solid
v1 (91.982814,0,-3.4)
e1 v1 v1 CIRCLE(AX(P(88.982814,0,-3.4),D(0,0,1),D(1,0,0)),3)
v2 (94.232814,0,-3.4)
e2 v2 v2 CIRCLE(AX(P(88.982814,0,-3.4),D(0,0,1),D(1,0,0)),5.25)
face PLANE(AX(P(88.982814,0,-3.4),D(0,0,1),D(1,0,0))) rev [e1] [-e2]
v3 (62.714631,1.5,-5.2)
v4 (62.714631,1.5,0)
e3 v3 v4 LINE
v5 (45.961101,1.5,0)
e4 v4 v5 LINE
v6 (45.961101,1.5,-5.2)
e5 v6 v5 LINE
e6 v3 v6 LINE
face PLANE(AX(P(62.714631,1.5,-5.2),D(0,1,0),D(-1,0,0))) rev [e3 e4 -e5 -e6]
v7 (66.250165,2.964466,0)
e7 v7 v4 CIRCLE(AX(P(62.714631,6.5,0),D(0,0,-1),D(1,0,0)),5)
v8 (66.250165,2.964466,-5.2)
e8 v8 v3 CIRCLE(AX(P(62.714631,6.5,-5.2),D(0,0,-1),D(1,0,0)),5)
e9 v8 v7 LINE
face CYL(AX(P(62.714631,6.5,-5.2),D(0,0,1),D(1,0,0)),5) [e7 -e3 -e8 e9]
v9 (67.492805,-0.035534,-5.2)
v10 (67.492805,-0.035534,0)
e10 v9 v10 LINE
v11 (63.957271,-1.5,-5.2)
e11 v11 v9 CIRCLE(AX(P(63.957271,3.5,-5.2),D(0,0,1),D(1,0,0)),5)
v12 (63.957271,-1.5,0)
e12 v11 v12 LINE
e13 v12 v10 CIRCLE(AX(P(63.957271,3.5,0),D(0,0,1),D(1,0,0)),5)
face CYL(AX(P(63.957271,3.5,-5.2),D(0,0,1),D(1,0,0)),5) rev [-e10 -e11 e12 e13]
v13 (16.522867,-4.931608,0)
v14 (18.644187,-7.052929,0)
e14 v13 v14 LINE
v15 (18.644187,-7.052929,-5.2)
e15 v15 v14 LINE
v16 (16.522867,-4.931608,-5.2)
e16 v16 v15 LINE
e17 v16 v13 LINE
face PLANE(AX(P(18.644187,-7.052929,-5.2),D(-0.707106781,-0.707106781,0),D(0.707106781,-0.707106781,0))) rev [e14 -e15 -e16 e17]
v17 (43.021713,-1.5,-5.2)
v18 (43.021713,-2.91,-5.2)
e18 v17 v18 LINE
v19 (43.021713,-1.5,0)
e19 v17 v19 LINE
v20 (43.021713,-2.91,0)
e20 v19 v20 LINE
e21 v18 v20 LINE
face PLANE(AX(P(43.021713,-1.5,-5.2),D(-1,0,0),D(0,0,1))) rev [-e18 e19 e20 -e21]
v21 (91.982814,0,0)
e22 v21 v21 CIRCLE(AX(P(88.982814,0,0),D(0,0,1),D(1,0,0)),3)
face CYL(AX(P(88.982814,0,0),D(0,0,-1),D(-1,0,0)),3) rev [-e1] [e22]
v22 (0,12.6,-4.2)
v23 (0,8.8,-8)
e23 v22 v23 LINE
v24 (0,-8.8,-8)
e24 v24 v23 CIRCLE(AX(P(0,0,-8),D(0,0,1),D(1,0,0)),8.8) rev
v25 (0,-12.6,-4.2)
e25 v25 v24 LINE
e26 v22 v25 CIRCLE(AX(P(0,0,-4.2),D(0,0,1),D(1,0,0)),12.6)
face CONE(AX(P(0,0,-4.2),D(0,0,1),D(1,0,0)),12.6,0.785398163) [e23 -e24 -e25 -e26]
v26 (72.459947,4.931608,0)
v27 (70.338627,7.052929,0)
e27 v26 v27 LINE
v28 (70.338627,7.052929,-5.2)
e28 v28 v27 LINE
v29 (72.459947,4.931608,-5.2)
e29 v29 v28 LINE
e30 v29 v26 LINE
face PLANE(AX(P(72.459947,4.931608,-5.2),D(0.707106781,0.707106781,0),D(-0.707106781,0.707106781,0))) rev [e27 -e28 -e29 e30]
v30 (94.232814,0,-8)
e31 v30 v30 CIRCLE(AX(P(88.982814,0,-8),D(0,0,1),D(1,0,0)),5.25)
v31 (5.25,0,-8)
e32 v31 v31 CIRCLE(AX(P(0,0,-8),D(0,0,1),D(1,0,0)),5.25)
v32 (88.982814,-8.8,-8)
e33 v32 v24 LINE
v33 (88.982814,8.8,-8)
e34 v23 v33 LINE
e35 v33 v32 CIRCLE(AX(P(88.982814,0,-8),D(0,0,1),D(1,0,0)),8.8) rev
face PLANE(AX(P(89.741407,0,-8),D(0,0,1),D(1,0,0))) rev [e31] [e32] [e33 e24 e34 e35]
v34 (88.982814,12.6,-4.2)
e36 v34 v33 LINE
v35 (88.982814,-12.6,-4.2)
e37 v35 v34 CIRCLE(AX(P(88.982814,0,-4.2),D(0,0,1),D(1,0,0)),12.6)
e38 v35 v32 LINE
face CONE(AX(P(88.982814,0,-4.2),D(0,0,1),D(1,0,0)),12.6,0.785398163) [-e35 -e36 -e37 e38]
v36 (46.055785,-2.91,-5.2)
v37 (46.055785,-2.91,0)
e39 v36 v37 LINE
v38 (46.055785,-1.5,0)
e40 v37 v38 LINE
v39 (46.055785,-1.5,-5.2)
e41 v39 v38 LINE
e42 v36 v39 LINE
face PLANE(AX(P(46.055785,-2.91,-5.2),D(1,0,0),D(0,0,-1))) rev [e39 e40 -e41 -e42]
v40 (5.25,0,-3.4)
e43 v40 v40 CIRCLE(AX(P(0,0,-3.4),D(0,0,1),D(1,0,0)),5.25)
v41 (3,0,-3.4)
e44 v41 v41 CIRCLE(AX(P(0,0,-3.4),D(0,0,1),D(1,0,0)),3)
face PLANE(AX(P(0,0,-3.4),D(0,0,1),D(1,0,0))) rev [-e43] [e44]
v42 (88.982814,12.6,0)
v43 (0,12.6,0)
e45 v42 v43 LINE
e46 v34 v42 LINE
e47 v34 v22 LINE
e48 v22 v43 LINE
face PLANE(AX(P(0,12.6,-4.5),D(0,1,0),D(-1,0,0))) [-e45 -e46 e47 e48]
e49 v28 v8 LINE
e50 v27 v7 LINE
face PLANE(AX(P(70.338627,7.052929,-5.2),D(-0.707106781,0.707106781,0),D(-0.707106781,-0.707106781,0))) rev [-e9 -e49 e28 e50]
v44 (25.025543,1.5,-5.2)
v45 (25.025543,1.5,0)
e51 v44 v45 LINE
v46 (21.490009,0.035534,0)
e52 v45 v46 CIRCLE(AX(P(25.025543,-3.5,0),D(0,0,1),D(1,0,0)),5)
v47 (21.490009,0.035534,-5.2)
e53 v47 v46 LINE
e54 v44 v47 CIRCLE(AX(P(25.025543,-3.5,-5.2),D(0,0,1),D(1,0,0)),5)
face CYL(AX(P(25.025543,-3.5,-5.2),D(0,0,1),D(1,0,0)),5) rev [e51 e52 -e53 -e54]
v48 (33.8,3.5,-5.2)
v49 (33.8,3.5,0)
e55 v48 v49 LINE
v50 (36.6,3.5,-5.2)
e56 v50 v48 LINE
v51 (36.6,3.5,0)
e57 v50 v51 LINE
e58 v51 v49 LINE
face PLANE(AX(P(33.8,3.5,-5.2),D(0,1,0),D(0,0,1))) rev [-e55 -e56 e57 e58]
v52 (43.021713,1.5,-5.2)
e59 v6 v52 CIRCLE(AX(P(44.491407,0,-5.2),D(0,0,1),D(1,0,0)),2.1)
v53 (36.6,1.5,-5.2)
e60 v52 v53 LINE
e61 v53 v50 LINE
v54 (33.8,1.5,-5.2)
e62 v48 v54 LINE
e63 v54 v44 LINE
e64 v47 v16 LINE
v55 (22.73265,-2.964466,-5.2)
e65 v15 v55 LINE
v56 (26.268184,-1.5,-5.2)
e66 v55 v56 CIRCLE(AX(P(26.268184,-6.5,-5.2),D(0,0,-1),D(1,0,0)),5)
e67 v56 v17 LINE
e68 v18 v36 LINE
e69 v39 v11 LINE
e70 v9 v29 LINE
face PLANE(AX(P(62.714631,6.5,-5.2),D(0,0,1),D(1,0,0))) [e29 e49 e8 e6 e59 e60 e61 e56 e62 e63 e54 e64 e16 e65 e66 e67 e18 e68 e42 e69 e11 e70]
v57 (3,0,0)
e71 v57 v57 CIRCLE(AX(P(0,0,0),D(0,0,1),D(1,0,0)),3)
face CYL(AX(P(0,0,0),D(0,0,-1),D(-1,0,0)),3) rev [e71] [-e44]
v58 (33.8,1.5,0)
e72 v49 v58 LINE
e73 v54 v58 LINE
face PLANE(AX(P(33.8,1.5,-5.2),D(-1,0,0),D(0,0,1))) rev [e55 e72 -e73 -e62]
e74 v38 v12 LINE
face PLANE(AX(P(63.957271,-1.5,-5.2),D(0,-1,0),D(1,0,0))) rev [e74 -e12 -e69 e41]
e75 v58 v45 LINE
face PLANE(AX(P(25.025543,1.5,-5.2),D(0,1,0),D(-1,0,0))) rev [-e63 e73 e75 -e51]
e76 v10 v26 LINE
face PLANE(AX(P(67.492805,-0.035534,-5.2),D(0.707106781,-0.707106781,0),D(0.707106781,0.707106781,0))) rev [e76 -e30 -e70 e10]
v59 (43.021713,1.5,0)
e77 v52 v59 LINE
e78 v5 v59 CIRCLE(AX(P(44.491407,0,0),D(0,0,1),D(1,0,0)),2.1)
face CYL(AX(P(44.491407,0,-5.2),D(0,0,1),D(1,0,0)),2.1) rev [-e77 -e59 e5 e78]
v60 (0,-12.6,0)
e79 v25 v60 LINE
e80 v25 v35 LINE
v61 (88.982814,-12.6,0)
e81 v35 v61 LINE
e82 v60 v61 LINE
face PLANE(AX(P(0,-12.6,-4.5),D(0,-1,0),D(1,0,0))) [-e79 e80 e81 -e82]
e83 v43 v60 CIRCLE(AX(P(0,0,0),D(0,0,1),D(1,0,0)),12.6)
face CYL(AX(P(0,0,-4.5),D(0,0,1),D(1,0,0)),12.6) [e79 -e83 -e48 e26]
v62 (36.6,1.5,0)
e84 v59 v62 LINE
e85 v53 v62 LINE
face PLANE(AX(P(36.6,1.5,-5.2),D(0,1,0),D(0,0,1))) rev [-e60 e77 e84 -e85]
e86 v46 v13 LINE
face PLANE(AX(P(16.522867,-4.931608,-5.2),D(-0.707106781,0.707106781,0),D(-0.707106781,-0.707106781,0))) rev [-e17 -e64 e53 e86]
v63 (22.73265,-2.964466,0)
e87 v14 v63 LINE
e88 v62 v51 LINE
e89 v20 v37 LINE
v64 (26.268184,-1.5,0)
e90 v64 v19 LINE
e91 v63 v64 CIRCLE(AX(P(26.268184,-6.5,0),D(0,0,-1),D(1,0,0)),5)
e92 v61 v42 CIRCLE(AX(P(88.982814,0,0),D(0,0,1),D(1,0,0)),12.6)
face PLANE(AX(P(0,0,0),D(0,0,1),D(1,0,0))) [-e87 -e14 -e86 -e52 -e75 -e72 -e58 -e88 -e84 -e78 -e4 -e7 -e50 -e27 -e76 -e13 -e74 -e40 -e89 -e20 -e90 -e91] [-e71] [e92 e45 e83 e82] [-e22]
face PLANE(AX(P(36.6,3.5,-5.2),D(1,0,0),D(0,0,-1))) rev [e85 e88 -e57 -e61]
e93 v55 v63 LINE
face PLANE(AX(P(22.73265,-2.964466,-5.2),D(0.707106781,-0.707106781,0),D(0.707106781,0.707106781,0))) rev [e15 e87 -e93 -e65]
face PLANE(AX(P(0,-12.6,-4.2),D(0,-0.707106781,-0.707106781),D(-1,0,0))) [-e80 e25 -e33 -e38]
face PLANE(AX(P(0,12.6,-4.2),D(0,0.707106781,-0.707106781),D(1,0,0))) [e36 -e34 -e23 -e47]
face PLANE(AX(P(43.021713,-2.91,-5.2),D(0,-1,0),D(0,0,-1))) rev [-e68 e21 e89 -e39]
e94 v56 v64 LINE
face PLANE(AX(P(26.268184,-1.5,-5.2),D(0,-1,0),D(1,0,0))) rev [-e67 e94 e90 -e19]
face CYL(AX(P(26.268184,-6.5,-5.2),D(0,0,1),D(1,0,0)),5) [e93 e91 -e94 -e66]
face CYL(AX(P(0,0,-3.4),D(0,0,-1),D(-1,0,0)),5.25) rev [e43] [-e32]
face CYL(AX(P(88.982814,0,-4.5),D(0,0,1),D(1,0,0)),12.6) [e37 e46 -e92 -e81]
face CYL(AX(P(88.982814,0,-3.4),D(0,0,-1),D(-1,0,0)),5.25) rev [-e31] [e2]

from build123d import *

# Parameters (mm, degrees)
BOSS_EXTRUDE1_DEPTH  = 4.5
BOSS_EXTRUDE2_DEPTH  = 4
CHAMFER2_START       = -4.2
CHAMFER2_2_DEPTH     = 4.2
CHAMFER2_START_2     = -8
CHAMFER2_3_OUTLINE_R = 8.8
CHAMFER2_3_DEPTH     = 3.8
SKETCH7_R            = 3
CUT_EXTRUDE3_DEPTH   = 103.673405561
SKETCH8_R            = 5.25
CUT_EXTRUDE4_DEPTH   = 4.6
CUT_EXTRUDE5_DEPTH   = 5.2


with BuildPart() as part:
    # Sketch1 → Boss-Extrude1 (new body)
    with BuildSketch(Plane.XY):
        with BuildLine():
            Line((0, 12.6), (88.982814426, 12.6))
            ThreePointArc((88.982814426, 12.6), (101.582814426, 0), (88.982814426, -12.6))
            Line((88.982814426, -12.6), (0, -12.6))
            ThreePointArc((0, -12.6), (-12.6, 0), (0, 12.6))
        make_face()
    extrude(amount=-BOSS_EXTRUDE1_DEPTH)

    # Sketch2 → Boss-Extrude2 (add)
    with BuildSketch(Plane.XY.offset(-8)):
        with BuildLine():
            Line((89.741407213, 8.85), (-0.758592787, 8.85))
            ThreePointArc((-0.758592787, 8.85), (-9.608592787, 0), (-0.758592787, -8.85))
            Line((-0.758592787, -8.85), (89.741407213, -8.85))
            ThreePointArc((89.741407213, -8.85), (98.591407213, 0), (89.741407213, 8.85))
        make_face()
    extrude(amount=BOSS_EXTRUDE2_DEPTH)

    # Chamfer2: read off the stored shape, not the designer's step
    # Chamfer2 outline → Chamfer2 (revolve)
    with BuildSketch(Plane.XZ):
        Polygon((8.8, -4.2), (8.8, -8), (12.6, -4.2), align=None)
    revolve(axis=Axis((0, 0, 0), (0, 0, 1)))

    # Chamfer2 2 outline → Chamfer2 2 (add)
    with BuildSketch(Plane.XY.offset(CHAMFER2_START)):
        with BuildLine():
            Line((88.982814426, 12.6), (0, 12.6))
            ThreePointArc((0, 12.6), (-12.6, 0), (0, -12.6))
            Line((0, -12.6), (88.982814426, -12.6))
            ThreePointArc((88.982814426, -12.6), (101.582814426, 0), (88.982814426, 12.6))
        make_face()
    extrude(amount=CHAMFER2_2_DEPTH)

    # Chamfer2 3 outline → Chamfer2 3 (add)
    with BuildSketch(Plane.XY.offset(CHAMFER2_START_2)):
        Circle(CHAMFER2_3_OUTLINE_R)
    extrude(amount=CHAMFER2_3_DEPTH)

    # Chamfer2 4: loft between two sections, ruled curve by curve
    chamfer2_4_from = [
        Edge.make_three_point_arc((88.982814426, -8.8, -8), (95.205354101, -6.222539674, -8), (97.782814426, 0, -8)),
        Edge.make_three_point_arc((97.782814426, 0, -8), (95.205354101, 6.222539674, -8), (88.982814426, 8.8, -8)),
        Edge.make_line((0, 8.8, -8), (88.982814426, 8.8, -8)),
        Edge.make_line((88.982814426, -8.8, -8), (0, -8.8, -8)),
        Edge.make_line((0, -8.8, -8), (0, 8.8, -8)),
    ]
    chamfer2_4_to = [
        Edge.make_three_point_arc((88.982814426, -12.6, -4.2), (97.892359869, -8.909545443, -4.2), (101.582814426, 0, -4.2)),
        Edge.make_three_point_arc((101.582814426, 0, -4.2), (97.892359869, 8.909545443, -4.2), (88.982814426, 12.6, -4.2)),
        Edge.make_line((0, 12.6, -4.2), (88.982814426, 12.6, -4.2)),
        Edge.make_line((88.982814426, -12.6, -4.2), (0, -12.6, -4.2)),
        Edge.make_line((0, -12.6, -4.2), (0, 12.6, -4.2)),
    ]
    chamfer2_4 = Solid(Shell([*[Face.make_surface_from_curves(chamfer2_4_from[k], chamfer2_4_to[k]) for k in range(5)], Face(Wire(chamfer2_4_from)), Face(Wire(chamfer2_4_to))]))
    add(chamfer2_4)

    # Sketch7 → Cut-Extrude3 (cut, through all)
    with BuildSketch(Plane.XY.offset(-8)):
        Circle(SKETCH7_R)
        with Locations((88.982814426, 0)):
            Circle(SKETCH7_R)
    extrude(amount=CUT_EXTRUDE3_DEPTH, mode=Mode.SUBTRACT)

    # Sketch8 → Cut-Extrude4 (cut)
    with BuildSketch(Plane.XY.offset(-8)):
        Circle(SKETCH8_R)
        with Locations((88.982814426, 0)):
            Circle(SKETCH8_R)
    extrude(amount=CUT_EXTRUDE4_DEPTH, mode=Mode.SUBTRACT)

    # Sketch9 → Cut-Extrude5 (cut)
    with BuildSketch(Plane.XY):
        with BuildLine():
            Line((22.732649866, -2.964466094), (18.644187371, -7.052928589))
            Line((18.644187371, -7.052928589), (16.522867028, -4.931608246))
            Line((16.522867028, -4.931608246), (21.490009179, 0.035533906))
            ThreePointArc((21.490009179, 0.035533906), (23.112125923, 1.119397663), (25.025543085, 1.5))
            Line((25.025543085, 1.5), (33.8, 1.5))
            Line((33.8, 1.5), (33.8, 3.5))
            Line((33.8, 3.5), (36.6, 3.5))
            Line((36.6, 3.5), (36.6, 1.5))
            Line((36.6, 1.5), (43.021713367, 1.5))
            ThreePointArc((43.021713367, 1.5), (44.491407213, 2.1), (45.961101059, 1.5))
            Line((45.961101059, 1.5), (62.714630654, 1.5))
            ThreePointArc((62.714630654, 1.5), (64.628047816, 1.880602337), (66.25016456, 2.964466094))
            Line((66.25016456, 2.964466094), (70.338627055, 7.052928589))
            Line((70.338627055, 7.052928589), (72.459947399, 4.931608246))
            Line((72.459947399, 4.931608246), (67.492805247, -0.035533906))
            ThreePointArc((67.492805247, -0.035533906), (65.870688503, -1.119397663), (63.957271341, -1.5))
            Line((63.957271341, -1.5), (46.05578497, -1.5))
            Line((46.05578497, -1.5), (46.05578497, -2.91))
            Line((46.05578497, -2.91), (43.021713367, -2.91))
            Line((43.021713367, -2.91), (43.021713367, -1.5))
            Line((43.021713367, -1.5), (26.268183772, -1.5))
            ThreePointArc((26.268183772, -1.5), (24.35476661, -1.880602337), (22.732649866, -2.964466094))
        make_face()
    extrude(amount=-CUT_EXTRUDE5_DEPTH, mode=Mode.SUBTRACT)


solid = part.part
